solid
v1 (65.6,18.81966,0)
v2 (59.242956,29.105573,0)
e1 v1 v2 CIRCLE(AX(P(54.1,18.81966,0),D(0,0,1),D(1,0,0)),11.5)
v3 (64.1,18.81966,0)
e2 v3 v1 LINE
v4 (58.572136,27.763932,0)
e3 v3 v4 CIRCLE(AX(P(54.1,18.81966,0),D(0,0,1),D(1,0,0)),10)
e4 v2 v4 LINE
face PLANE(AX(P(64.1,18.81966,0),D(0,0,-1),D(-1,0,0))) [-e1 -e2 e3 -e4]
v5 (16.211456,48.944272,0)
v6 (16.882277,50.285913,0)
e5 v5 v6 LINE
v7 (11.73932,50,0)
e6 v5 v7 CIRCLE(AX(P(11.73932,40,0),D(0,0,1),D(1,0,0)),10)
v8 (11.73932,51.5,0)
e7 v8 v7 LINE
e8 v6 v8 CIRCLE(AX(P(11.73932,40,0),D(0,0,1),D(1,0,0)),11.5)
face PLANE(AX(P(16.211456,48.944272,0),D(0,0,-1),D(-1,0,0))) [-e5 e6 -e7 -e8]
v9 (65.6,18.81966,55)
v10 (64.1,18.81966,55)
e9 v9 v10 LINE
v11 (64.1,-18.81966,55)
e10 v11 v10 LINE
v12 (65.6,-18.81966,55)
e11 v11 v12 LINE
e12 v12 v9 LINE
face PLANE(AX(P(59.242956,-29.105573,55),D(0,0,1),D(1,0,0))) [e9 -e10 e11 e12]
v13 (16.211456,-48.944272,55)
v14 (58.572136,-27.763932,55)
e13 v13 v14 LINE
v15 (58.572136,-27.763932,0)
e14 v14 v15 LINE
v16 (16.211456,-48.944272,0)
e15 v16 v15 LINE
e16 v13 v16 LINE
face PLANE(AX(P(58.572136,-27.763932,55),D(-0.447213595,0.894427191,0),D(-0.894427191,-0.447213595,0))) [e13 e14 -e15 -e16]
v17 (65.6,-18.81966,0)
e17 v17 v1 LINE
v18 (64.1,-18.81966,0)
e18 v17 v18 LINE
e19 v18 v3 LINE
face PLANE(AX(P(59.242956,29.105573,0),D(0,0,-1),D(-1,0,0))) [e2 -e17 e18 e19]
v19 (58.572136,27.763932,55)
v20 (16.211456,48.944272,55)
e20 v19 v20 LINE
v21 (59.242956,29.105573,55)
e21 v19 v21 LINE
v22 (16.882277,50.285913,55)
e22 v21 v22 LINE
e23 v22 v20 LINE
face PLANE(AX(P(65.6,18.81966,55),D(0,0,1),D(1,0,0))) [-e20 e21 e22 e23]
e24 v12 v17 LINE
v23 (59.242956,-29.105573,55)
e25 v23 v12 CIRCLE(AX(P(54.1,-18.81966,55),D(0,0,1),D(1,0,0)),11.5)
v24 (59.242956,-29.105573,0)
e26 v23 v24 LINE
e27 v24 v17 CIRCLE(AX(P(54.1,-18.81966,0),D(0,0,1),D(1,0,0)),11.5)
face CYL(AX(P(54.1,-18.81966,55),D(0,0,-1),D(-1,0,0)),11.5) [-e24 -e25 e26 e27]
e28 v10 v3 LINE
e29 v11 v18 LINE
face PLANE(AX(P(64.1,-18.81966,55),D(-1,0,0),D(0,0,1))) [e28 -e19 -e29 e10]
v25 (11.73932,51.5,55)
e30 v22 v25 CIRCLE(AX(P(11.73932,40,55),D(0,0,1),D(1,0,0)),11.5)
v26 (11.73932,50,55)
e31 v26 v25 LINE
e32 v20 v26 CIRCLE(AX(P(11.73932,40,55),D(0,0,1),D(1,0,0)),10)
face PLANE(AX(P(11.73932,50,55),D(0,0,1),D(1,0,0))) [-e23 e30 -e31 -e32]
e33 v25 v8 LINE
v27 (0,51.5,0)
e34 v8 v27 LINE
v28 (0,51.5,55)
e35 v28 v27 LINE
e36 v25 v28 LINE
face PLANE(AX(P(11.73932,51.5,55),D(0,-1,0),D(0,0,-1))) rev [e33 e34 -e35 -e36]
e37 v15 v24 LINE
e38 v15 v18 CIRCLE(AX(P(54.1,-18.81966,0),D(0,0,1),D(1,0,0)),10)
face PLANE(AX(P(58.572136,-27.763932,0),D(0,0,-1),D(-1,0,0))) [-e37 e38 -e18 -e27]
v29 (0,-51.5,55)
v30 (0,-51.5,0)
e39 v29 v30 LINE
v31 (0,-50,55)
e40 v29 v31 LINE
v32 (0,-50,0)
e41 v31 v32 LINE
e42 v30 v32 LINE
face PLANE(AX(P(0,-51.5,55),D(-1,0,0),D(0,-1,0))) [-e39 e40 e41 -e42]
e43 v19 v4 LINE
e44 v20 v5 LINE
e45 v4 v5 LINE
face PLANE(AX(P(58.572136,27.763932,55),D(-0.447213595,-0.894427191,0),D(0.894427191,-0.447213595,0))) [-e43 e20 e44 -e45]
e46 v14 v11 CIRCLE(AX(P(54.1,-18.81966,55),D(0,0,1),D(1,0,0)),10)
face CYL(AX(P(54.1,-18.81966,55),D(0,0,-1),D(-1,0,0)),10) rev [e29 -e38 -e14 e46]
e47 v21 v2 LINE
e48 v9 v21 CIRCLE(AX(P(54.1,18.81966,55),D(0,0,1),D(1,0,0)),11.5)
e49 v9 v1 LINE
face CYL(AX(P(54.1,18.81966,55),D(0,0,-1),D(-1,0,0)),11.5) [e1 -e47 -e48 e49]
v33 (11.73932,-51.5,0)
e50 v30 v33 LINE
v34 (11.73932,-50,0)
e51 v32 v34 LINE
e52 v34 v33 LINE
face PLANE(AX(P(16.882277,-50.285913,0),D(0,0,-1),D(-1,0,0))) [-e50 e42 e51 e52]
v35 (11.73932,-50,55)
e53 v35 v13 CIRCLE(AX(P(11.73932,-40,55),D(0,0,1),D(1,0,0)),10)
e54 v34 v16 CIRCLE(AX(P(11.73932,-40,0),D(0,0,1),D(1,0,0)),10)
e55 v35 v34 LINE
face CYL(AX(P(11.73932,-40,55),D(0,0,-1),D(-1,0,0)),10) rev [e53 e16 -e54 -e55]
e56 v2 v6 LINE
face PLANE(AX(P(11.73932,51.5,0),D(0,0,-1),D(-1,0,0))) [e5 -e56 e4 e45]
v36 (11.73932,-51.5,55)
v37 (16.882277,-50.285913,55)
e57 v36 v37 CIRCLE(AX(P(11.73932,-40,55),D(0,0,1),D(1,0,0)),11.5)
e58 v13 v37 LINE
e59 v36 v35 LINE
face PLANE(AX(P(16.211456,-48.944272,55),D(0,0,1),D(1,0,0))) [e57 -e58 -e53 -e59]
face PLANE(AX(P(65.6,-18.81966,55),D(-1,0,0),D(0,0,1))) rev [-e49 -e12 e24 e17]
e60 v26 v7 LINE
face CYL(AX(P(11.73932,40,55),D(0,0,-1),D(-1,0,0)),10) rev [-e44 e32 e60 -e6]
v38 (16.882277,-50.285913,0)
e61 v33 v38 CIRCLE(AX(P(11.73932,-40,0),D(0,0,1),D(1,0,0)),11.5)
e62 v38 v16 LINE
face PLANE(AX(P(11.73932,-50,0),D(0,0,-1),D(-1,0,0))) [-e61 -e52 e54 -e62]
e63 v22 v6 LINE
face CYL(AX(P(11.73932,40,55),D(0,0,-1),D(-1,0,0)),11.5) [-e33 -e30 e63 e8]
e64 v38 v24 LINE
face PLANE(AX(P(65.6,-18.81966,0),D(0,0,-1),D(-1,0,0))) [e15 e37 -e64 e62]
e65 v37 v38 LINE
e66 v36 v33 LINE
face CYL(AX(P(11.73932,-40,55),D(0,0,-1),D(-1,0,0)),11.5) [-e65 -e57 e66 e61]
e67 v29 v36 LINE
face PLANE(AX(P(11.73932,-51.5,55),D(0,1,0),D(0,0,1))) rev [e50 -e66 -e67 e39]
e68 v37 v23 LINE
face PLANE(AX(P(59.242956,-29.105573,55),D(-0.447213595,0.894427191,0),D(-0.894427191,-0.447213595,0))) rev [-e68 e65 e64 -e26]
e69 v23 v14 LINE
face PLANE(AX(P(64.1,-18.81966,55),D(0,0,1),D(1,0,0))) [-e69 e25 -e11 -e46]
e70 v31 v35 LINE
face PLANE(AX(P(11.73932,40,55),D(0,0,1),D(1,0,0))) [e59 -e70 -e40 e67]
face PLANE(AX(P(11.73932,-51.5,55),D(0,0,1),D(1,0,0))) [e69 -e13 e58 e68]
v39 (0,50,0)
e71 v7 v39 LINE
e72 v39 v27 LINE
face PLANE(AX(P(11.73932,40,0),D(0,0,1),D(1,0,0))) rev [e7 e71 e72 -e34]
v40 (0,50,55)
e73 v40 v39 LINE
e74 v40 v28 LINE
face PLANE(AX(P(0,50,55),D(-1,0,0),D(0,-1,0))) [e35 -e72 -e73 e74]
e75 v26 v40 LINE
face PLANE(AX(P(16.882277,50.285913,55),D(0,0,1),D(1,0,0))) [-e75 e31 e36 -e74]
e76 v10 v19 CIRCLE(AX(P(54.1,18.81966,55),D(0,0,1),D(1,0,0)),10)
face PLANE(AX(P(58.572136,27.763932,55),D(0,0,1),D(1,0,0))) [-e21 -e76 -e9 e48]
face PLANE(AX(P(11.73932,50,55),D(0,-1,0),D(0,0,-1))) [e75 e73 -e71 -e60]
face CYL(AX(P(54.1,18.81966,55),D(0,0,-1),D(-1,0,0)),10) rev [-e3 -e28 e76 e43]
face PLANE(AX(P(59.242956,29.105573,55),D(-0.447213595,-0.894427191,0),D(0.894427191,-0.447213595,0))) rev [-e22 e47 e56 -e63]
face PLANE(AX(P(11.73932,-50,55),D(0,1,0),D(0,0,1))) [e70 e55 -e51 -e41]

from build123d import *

# Parameters (mm, degrees)
BASE_FLANGE1_DEPTH = 55


# Sheet-metal steps are written as plain solids
with BuildPart() as part:
    # Sketch1 → Base-Flange1 (new body)
    with BuildSketch(Plane.XY):
        with BuildLine():
            Line((0, -50), (11.739320225, -50))
            ThreePointArc((11.739320225, -50), (14.03684943, -49.732489895), (16.21145618, -48.94427191))
            Line((16.21145618, -48.94427191), (58.572135955, -27.763932023))
            ThreePointArc((58.572135955, -27.763932023), (62.606508084, -24.076971234), (64.1, -18.819660113))
            Line((64.1, -18.819660113), (64.1, 18.819660113))
            ThreePointArc((64.1, 18.819660113), (62.606508084, 24.076971234), (58.572135955, 27.763932023))
            Line((58.572135955, 27.763932023), (16.21145618, 48.94427191))
            ThreePointArc((16.21145618, 48.94427191), (14.03684943, 49.732489895), (11.739320225, 50))
            Line((11.739320225, 50), (0, 50))
            Line((0, 50), (0, 51.5))
            Line((0, 51.5), (11.739320225, 51.5))
            ThreePointArc((11.739320225, 51.5), (14.381478811, 51.192363379), (16.882276573, 50.285912696))
            Line((16.882276573, 50.285912696), (59.242956348, 29.105572809))
            ThreePointArc((59.242956348, 29.105572809), (63.882484296, 24.865567902), (65.6, 18.819660113))
            Line((65.6, 18.819660113), (65.6, -18.819660113))
            ThreePointArc((65.6, -18.819660113), (63.882484296, -24.865567902), (59.242956348, -29.105572809))
            Line((59.242956348, -29.105572809), (16.882276573, -50.285912696))
            ThreePointArc((16.882276573, -50.285912696), (14.381478811, -51.192363379), (11.739320225, -51.5))
            Line((11.739320225, -51.5), (0, -51.5))
            Line((0, -51.5), (0, -50))
        make_face()
    extrude(amount=BASE_FLANGE1_DEPTH)


solid = part.part
